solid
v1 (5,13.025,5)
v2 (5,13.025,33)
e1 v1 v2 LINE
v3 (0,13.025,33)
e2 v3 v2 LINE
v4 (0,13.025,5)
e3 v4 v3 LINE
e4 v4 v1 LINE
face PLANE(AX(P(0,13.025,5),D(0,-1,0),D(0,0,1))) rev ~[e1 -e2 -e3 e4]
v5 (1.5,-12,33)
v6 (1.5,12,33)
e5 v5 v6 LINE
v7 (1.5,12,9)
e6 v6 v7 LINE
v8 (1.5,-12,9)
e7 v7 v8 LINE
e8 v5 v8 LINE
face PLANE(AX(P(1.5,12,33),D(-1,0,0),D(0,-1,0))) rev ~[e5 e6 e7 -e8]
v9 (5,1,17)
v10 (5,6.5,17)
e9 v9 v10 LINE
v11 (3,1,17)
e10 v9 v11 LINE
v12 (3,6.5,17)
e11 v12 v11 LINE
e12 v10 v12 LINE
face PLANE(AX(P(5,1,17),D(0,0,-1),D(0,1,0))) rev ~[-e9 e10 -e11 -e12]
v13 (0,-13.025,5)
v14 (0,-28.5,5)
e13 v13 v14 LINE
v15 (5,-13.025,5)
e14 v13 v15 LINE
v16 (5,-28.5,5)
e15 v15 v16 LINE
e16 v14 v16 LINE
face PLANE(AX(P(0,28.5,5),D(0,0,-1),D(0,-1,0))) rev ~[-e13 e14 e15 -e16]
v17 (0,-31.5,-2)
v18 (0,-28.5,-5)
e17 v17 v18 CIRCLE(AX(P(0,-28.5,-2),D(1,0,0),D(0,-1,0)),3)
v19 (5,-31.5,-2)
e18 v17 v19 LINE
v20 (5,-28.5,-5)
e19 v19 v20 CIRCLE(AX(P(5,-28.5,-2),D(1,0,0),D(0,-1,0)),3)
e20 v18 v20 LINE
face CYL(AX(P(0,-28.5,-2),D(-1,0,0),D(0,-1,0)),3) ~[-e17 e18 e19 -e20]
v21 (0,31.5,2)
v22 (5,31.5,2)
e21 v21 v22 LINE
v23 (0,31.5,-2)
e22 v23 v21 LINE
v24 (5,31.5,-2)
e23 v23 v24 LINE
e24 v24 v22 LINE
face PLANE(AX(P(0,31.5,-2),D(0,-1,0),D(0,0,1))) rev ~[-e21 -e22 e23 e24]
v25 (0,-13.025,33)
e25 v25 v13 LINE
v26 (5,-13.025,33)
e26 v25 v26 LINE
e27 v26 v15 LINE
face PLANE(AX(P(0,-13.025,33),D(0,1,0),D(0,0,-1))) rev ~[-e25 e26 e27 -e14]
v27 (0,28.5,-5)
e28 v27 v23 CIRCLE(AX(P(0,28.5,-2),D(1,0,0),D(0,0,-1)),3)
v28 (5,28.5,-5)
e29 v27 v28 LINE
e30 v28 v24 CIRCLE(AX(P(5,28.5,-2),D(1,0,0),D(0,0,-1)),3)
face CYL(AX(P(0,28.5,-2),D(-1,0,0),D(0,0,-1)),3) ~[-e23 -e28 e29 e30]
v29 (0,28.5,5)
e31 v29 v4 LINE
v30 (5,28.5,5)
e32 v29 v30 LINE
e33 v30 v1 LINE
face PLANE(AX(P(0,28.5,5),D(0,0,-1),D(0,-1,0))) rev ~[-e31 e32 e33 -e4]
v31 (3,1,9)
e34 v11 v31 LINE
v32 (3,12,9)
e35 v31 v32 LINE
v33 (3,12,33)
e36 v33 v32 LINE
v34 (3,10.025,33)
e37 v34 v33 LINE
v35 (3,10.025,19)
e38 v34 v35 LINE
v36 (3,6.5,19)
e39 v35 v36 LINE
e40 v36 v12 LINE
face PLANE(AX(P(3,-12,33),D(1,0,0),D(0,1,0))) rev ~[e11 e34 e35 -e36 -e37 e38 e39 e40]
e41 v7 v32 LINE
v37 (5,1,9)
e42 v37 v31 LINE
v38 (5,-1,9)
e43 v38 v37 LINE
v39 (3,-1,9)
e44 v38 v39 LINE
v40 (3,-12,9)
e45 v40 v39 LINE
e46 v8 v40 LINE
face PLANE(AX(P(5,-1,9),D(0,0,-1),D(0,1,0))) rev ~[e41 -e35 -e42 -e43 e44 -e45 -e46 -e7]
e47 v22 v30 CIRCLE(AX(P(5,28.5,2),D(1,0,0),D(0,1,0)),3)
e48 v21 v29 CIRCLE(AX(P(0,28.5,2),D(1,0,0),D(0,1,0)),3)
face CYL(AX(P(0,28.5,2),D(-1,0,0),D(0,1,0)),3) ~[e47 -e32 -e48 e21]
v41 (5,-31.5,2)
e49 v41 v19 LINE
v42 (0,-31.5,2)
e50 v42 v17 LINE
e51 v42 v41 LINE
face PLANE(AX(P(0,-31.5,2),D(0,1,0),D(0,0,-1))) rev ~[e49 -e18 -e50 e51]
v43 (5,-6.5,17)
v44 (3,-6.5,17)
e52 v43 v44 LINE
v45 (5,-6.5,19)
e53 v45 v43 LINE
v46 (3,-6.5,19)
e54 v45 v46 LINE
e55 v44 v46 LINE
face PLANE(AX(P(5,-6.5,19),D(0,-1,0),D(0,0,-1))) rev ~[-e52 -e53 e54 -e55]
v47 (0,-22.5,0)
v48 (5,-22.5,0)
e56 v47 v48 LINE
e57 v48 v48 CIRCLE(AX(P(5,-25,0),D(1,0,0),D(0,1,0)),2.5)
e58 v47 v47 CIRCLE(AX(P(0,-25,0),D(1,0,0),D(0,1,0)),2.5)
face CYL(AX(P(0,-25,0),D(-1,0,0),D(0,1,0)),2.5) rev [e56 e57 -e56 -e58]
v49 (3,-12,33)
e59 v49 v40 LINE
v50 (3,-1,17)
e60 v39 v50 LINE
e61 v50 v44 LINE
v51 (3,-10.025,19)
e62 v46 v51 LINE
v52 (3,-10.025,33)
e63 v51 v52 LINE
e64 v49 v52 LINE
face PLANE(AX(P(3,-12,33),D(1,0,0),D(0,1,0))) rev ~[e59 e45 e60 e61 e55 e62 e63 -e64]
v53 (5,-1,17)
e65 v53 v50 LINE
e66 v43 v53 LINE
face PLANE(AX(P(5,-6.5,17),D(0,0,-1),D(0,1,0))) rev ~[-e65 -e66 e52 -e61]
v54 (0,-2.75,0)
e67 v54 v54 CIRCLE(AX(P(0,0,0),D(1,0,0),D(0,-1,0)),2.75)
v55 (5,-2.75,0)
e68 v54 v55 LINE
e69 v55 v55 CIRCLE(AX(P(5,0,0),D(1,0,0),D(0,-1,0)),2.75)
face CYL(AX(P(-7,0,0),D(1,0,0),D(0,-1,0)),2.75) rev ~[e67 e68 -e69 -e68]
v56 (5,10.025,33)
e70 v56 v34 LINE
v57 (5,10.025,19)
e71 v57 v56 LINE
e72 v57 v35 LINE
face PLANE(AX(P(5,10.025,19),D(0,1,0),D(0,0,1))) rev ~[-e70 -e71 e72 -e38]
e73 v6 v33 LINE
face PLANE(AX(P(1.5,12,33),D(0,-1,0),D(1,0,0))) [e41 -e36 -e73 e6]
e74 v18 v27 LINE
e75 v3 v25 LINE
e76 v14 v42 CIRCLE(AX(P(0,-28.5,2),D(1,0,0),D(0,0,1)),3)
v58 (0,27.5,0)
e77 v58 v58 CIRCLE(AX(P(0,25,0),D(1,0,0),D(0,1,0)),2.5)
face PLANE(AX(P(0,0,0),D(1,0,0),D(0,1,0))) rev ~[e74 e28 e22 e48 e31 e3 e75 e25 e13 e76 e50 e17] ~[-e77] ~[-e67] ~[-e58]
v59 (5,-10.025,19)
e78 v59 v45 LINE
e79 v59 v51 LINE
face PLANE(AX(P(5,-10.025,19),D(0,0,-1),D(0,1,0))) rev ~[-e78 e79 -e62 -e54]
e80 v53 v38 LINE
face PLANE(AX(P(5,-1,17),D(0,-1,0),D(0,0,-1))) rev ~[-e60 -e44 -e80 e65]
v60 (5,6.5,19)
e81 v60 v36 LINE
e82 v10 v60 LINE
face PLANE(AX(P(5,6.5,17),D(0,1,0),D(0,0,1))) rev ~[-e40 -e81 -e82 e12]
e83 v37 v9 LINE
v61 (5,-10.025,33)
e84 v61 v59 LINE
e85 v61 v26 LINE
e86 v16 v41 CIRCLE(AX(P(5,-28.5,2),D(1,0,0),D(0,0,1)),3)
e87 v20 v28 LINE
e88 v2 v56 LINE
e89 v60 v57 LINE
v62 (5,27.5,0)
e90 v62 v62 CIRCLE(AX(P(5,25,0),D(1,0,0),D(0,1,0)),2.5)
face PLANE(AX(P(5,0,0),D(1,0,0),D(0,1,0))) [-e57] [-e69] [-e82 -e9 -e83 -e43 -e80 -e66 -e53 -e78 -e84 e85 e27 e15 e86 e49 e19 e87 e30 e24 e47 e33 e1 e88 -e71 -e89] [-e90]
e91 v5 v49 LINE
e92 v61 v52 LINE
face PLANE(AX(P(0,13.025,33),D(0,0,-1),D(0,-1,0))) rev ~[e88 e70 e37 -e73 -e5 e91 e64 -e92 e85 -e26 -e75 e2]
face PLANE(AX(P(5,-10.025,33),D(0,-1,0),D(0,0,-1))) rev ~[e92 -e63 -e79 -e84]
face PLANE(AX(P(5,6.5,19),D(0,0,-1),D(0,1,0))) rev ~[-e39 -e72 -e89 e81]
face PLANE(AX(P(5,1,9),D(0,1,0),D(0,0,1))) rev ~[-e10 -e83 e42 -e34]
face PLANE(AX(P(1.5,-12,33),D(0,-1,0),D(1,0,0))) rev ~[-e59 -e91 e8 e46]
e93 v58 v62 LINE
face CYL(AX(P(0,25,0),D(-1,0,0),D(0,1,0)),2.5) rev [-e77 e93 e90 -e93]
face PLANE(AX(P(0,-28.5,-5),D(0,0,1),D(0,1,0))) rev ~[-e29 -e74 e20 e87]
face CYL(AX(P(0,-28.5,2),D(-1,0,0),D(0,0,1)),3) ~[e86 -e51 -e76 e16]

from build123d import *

# Parameters (mm, degrees)
F0_R     = 2.5
F1_DEPTH = 5
F2_D     = 5.5
F2_DEPTH = 7
F2_TIP   = 1.6523667023
F4_DEPTH = 5
F6_DEPTH = 3.5
F7_W     = 1.5
F7_H     = 1.975
F8_DEPTH = 24


with BuildPart() as f1:
    # F0 (on Right) → F1 (new body)
    with BuildSketch(Plane.YZ):
        with BuildLine():
            Line((-28.5, -5), (28.5, -5))
            ThreePointArc((28.5, -5), (30.6213203436, -4.1213203436), (31.5, -2))
            Line((31.5, -2), (31.5, 2))
            ThreePointArc((31.5, 2), (30.6213203436, 4.1213203436), (28.5, 5))
            Line((28.5, 5), (-28.5, 5))
            ThreePointArc((-28.5, 5), (-30.6213203436, 4.1213203436), (-31.5, 2))
            Line((-31.5, 2), (-31.5, -2))
            ThreePointArc((-31.5, -2), (-30.6213203436, -4.1213203436), (-28.5, -5))
        make_face()
        with Locations((-25, 0)):
            Circle(F0_R, mode=Mode.SUBTRACT)
        with Locations((25, 0)):
            Circle(F0_R, mode=Mode.SUBTRACT)
    extrude(amount=F1_DEPTH)

    # F2
    with Locations(Plane(origin=(0, 0, 0), x_dir=(0, 1, 0), z_dir=(-1, 0, 0))):
        with Locations((0, 0)):
            Hole(F2_D / 2, depth=F2_DEPTH)
            with Locations((0, 0, -(F2_DEPTH + F2_TIP / 2))):  # 118° drill point
                Cone(0, F2_D / 2, F2_TIP, mode=Mode.SUBTRACT)

    # F3 (on Right) → F4 (join, through all)
    with BuildSketch(Plane.YZ):
        Polygon((-13.025, 33), (-13.025, 5), (13.025, 5), (13.025, 33), (0, 33), align=None)
    extrude(amount=F4_DEPTH)

    # F5 (on face) → F6 (cut)
    with BuildSketch(Plane.YZ.offset(5)):
        Polygon((10.025, 33), (-10.025, 33), (-10.025, 19), (-6.5, 19), (-6.5, 17), (-1, 17), (-1, 9), (1, 9), (1, 17), (6.5, 17), (6.5, 19), (10.025, 19), align=None)
    extrude(amount=-F6_DEPTH, mode=Mode.SUBTRACT)

    # F7 (on face) → F8 (cut, through all)
    with BuildSketch(Plane.XY.offset(33)):
        Polygon((1.5, 10.025), (1.5, 0), (1.5, -10.025), (3, -10.025), (3, 0), (3, 10.025), align=None)
        with Locations((2.25, -11.0125)):
            Rectangle(F7_W, F7_H)
        with Locations((2.25, 11.0125)):
            Rectangle(F7_W, F7_H)
    extrude(amount=-F8_DEPTH, mode=Mode.SUBTRACT)


solid = f1.part
